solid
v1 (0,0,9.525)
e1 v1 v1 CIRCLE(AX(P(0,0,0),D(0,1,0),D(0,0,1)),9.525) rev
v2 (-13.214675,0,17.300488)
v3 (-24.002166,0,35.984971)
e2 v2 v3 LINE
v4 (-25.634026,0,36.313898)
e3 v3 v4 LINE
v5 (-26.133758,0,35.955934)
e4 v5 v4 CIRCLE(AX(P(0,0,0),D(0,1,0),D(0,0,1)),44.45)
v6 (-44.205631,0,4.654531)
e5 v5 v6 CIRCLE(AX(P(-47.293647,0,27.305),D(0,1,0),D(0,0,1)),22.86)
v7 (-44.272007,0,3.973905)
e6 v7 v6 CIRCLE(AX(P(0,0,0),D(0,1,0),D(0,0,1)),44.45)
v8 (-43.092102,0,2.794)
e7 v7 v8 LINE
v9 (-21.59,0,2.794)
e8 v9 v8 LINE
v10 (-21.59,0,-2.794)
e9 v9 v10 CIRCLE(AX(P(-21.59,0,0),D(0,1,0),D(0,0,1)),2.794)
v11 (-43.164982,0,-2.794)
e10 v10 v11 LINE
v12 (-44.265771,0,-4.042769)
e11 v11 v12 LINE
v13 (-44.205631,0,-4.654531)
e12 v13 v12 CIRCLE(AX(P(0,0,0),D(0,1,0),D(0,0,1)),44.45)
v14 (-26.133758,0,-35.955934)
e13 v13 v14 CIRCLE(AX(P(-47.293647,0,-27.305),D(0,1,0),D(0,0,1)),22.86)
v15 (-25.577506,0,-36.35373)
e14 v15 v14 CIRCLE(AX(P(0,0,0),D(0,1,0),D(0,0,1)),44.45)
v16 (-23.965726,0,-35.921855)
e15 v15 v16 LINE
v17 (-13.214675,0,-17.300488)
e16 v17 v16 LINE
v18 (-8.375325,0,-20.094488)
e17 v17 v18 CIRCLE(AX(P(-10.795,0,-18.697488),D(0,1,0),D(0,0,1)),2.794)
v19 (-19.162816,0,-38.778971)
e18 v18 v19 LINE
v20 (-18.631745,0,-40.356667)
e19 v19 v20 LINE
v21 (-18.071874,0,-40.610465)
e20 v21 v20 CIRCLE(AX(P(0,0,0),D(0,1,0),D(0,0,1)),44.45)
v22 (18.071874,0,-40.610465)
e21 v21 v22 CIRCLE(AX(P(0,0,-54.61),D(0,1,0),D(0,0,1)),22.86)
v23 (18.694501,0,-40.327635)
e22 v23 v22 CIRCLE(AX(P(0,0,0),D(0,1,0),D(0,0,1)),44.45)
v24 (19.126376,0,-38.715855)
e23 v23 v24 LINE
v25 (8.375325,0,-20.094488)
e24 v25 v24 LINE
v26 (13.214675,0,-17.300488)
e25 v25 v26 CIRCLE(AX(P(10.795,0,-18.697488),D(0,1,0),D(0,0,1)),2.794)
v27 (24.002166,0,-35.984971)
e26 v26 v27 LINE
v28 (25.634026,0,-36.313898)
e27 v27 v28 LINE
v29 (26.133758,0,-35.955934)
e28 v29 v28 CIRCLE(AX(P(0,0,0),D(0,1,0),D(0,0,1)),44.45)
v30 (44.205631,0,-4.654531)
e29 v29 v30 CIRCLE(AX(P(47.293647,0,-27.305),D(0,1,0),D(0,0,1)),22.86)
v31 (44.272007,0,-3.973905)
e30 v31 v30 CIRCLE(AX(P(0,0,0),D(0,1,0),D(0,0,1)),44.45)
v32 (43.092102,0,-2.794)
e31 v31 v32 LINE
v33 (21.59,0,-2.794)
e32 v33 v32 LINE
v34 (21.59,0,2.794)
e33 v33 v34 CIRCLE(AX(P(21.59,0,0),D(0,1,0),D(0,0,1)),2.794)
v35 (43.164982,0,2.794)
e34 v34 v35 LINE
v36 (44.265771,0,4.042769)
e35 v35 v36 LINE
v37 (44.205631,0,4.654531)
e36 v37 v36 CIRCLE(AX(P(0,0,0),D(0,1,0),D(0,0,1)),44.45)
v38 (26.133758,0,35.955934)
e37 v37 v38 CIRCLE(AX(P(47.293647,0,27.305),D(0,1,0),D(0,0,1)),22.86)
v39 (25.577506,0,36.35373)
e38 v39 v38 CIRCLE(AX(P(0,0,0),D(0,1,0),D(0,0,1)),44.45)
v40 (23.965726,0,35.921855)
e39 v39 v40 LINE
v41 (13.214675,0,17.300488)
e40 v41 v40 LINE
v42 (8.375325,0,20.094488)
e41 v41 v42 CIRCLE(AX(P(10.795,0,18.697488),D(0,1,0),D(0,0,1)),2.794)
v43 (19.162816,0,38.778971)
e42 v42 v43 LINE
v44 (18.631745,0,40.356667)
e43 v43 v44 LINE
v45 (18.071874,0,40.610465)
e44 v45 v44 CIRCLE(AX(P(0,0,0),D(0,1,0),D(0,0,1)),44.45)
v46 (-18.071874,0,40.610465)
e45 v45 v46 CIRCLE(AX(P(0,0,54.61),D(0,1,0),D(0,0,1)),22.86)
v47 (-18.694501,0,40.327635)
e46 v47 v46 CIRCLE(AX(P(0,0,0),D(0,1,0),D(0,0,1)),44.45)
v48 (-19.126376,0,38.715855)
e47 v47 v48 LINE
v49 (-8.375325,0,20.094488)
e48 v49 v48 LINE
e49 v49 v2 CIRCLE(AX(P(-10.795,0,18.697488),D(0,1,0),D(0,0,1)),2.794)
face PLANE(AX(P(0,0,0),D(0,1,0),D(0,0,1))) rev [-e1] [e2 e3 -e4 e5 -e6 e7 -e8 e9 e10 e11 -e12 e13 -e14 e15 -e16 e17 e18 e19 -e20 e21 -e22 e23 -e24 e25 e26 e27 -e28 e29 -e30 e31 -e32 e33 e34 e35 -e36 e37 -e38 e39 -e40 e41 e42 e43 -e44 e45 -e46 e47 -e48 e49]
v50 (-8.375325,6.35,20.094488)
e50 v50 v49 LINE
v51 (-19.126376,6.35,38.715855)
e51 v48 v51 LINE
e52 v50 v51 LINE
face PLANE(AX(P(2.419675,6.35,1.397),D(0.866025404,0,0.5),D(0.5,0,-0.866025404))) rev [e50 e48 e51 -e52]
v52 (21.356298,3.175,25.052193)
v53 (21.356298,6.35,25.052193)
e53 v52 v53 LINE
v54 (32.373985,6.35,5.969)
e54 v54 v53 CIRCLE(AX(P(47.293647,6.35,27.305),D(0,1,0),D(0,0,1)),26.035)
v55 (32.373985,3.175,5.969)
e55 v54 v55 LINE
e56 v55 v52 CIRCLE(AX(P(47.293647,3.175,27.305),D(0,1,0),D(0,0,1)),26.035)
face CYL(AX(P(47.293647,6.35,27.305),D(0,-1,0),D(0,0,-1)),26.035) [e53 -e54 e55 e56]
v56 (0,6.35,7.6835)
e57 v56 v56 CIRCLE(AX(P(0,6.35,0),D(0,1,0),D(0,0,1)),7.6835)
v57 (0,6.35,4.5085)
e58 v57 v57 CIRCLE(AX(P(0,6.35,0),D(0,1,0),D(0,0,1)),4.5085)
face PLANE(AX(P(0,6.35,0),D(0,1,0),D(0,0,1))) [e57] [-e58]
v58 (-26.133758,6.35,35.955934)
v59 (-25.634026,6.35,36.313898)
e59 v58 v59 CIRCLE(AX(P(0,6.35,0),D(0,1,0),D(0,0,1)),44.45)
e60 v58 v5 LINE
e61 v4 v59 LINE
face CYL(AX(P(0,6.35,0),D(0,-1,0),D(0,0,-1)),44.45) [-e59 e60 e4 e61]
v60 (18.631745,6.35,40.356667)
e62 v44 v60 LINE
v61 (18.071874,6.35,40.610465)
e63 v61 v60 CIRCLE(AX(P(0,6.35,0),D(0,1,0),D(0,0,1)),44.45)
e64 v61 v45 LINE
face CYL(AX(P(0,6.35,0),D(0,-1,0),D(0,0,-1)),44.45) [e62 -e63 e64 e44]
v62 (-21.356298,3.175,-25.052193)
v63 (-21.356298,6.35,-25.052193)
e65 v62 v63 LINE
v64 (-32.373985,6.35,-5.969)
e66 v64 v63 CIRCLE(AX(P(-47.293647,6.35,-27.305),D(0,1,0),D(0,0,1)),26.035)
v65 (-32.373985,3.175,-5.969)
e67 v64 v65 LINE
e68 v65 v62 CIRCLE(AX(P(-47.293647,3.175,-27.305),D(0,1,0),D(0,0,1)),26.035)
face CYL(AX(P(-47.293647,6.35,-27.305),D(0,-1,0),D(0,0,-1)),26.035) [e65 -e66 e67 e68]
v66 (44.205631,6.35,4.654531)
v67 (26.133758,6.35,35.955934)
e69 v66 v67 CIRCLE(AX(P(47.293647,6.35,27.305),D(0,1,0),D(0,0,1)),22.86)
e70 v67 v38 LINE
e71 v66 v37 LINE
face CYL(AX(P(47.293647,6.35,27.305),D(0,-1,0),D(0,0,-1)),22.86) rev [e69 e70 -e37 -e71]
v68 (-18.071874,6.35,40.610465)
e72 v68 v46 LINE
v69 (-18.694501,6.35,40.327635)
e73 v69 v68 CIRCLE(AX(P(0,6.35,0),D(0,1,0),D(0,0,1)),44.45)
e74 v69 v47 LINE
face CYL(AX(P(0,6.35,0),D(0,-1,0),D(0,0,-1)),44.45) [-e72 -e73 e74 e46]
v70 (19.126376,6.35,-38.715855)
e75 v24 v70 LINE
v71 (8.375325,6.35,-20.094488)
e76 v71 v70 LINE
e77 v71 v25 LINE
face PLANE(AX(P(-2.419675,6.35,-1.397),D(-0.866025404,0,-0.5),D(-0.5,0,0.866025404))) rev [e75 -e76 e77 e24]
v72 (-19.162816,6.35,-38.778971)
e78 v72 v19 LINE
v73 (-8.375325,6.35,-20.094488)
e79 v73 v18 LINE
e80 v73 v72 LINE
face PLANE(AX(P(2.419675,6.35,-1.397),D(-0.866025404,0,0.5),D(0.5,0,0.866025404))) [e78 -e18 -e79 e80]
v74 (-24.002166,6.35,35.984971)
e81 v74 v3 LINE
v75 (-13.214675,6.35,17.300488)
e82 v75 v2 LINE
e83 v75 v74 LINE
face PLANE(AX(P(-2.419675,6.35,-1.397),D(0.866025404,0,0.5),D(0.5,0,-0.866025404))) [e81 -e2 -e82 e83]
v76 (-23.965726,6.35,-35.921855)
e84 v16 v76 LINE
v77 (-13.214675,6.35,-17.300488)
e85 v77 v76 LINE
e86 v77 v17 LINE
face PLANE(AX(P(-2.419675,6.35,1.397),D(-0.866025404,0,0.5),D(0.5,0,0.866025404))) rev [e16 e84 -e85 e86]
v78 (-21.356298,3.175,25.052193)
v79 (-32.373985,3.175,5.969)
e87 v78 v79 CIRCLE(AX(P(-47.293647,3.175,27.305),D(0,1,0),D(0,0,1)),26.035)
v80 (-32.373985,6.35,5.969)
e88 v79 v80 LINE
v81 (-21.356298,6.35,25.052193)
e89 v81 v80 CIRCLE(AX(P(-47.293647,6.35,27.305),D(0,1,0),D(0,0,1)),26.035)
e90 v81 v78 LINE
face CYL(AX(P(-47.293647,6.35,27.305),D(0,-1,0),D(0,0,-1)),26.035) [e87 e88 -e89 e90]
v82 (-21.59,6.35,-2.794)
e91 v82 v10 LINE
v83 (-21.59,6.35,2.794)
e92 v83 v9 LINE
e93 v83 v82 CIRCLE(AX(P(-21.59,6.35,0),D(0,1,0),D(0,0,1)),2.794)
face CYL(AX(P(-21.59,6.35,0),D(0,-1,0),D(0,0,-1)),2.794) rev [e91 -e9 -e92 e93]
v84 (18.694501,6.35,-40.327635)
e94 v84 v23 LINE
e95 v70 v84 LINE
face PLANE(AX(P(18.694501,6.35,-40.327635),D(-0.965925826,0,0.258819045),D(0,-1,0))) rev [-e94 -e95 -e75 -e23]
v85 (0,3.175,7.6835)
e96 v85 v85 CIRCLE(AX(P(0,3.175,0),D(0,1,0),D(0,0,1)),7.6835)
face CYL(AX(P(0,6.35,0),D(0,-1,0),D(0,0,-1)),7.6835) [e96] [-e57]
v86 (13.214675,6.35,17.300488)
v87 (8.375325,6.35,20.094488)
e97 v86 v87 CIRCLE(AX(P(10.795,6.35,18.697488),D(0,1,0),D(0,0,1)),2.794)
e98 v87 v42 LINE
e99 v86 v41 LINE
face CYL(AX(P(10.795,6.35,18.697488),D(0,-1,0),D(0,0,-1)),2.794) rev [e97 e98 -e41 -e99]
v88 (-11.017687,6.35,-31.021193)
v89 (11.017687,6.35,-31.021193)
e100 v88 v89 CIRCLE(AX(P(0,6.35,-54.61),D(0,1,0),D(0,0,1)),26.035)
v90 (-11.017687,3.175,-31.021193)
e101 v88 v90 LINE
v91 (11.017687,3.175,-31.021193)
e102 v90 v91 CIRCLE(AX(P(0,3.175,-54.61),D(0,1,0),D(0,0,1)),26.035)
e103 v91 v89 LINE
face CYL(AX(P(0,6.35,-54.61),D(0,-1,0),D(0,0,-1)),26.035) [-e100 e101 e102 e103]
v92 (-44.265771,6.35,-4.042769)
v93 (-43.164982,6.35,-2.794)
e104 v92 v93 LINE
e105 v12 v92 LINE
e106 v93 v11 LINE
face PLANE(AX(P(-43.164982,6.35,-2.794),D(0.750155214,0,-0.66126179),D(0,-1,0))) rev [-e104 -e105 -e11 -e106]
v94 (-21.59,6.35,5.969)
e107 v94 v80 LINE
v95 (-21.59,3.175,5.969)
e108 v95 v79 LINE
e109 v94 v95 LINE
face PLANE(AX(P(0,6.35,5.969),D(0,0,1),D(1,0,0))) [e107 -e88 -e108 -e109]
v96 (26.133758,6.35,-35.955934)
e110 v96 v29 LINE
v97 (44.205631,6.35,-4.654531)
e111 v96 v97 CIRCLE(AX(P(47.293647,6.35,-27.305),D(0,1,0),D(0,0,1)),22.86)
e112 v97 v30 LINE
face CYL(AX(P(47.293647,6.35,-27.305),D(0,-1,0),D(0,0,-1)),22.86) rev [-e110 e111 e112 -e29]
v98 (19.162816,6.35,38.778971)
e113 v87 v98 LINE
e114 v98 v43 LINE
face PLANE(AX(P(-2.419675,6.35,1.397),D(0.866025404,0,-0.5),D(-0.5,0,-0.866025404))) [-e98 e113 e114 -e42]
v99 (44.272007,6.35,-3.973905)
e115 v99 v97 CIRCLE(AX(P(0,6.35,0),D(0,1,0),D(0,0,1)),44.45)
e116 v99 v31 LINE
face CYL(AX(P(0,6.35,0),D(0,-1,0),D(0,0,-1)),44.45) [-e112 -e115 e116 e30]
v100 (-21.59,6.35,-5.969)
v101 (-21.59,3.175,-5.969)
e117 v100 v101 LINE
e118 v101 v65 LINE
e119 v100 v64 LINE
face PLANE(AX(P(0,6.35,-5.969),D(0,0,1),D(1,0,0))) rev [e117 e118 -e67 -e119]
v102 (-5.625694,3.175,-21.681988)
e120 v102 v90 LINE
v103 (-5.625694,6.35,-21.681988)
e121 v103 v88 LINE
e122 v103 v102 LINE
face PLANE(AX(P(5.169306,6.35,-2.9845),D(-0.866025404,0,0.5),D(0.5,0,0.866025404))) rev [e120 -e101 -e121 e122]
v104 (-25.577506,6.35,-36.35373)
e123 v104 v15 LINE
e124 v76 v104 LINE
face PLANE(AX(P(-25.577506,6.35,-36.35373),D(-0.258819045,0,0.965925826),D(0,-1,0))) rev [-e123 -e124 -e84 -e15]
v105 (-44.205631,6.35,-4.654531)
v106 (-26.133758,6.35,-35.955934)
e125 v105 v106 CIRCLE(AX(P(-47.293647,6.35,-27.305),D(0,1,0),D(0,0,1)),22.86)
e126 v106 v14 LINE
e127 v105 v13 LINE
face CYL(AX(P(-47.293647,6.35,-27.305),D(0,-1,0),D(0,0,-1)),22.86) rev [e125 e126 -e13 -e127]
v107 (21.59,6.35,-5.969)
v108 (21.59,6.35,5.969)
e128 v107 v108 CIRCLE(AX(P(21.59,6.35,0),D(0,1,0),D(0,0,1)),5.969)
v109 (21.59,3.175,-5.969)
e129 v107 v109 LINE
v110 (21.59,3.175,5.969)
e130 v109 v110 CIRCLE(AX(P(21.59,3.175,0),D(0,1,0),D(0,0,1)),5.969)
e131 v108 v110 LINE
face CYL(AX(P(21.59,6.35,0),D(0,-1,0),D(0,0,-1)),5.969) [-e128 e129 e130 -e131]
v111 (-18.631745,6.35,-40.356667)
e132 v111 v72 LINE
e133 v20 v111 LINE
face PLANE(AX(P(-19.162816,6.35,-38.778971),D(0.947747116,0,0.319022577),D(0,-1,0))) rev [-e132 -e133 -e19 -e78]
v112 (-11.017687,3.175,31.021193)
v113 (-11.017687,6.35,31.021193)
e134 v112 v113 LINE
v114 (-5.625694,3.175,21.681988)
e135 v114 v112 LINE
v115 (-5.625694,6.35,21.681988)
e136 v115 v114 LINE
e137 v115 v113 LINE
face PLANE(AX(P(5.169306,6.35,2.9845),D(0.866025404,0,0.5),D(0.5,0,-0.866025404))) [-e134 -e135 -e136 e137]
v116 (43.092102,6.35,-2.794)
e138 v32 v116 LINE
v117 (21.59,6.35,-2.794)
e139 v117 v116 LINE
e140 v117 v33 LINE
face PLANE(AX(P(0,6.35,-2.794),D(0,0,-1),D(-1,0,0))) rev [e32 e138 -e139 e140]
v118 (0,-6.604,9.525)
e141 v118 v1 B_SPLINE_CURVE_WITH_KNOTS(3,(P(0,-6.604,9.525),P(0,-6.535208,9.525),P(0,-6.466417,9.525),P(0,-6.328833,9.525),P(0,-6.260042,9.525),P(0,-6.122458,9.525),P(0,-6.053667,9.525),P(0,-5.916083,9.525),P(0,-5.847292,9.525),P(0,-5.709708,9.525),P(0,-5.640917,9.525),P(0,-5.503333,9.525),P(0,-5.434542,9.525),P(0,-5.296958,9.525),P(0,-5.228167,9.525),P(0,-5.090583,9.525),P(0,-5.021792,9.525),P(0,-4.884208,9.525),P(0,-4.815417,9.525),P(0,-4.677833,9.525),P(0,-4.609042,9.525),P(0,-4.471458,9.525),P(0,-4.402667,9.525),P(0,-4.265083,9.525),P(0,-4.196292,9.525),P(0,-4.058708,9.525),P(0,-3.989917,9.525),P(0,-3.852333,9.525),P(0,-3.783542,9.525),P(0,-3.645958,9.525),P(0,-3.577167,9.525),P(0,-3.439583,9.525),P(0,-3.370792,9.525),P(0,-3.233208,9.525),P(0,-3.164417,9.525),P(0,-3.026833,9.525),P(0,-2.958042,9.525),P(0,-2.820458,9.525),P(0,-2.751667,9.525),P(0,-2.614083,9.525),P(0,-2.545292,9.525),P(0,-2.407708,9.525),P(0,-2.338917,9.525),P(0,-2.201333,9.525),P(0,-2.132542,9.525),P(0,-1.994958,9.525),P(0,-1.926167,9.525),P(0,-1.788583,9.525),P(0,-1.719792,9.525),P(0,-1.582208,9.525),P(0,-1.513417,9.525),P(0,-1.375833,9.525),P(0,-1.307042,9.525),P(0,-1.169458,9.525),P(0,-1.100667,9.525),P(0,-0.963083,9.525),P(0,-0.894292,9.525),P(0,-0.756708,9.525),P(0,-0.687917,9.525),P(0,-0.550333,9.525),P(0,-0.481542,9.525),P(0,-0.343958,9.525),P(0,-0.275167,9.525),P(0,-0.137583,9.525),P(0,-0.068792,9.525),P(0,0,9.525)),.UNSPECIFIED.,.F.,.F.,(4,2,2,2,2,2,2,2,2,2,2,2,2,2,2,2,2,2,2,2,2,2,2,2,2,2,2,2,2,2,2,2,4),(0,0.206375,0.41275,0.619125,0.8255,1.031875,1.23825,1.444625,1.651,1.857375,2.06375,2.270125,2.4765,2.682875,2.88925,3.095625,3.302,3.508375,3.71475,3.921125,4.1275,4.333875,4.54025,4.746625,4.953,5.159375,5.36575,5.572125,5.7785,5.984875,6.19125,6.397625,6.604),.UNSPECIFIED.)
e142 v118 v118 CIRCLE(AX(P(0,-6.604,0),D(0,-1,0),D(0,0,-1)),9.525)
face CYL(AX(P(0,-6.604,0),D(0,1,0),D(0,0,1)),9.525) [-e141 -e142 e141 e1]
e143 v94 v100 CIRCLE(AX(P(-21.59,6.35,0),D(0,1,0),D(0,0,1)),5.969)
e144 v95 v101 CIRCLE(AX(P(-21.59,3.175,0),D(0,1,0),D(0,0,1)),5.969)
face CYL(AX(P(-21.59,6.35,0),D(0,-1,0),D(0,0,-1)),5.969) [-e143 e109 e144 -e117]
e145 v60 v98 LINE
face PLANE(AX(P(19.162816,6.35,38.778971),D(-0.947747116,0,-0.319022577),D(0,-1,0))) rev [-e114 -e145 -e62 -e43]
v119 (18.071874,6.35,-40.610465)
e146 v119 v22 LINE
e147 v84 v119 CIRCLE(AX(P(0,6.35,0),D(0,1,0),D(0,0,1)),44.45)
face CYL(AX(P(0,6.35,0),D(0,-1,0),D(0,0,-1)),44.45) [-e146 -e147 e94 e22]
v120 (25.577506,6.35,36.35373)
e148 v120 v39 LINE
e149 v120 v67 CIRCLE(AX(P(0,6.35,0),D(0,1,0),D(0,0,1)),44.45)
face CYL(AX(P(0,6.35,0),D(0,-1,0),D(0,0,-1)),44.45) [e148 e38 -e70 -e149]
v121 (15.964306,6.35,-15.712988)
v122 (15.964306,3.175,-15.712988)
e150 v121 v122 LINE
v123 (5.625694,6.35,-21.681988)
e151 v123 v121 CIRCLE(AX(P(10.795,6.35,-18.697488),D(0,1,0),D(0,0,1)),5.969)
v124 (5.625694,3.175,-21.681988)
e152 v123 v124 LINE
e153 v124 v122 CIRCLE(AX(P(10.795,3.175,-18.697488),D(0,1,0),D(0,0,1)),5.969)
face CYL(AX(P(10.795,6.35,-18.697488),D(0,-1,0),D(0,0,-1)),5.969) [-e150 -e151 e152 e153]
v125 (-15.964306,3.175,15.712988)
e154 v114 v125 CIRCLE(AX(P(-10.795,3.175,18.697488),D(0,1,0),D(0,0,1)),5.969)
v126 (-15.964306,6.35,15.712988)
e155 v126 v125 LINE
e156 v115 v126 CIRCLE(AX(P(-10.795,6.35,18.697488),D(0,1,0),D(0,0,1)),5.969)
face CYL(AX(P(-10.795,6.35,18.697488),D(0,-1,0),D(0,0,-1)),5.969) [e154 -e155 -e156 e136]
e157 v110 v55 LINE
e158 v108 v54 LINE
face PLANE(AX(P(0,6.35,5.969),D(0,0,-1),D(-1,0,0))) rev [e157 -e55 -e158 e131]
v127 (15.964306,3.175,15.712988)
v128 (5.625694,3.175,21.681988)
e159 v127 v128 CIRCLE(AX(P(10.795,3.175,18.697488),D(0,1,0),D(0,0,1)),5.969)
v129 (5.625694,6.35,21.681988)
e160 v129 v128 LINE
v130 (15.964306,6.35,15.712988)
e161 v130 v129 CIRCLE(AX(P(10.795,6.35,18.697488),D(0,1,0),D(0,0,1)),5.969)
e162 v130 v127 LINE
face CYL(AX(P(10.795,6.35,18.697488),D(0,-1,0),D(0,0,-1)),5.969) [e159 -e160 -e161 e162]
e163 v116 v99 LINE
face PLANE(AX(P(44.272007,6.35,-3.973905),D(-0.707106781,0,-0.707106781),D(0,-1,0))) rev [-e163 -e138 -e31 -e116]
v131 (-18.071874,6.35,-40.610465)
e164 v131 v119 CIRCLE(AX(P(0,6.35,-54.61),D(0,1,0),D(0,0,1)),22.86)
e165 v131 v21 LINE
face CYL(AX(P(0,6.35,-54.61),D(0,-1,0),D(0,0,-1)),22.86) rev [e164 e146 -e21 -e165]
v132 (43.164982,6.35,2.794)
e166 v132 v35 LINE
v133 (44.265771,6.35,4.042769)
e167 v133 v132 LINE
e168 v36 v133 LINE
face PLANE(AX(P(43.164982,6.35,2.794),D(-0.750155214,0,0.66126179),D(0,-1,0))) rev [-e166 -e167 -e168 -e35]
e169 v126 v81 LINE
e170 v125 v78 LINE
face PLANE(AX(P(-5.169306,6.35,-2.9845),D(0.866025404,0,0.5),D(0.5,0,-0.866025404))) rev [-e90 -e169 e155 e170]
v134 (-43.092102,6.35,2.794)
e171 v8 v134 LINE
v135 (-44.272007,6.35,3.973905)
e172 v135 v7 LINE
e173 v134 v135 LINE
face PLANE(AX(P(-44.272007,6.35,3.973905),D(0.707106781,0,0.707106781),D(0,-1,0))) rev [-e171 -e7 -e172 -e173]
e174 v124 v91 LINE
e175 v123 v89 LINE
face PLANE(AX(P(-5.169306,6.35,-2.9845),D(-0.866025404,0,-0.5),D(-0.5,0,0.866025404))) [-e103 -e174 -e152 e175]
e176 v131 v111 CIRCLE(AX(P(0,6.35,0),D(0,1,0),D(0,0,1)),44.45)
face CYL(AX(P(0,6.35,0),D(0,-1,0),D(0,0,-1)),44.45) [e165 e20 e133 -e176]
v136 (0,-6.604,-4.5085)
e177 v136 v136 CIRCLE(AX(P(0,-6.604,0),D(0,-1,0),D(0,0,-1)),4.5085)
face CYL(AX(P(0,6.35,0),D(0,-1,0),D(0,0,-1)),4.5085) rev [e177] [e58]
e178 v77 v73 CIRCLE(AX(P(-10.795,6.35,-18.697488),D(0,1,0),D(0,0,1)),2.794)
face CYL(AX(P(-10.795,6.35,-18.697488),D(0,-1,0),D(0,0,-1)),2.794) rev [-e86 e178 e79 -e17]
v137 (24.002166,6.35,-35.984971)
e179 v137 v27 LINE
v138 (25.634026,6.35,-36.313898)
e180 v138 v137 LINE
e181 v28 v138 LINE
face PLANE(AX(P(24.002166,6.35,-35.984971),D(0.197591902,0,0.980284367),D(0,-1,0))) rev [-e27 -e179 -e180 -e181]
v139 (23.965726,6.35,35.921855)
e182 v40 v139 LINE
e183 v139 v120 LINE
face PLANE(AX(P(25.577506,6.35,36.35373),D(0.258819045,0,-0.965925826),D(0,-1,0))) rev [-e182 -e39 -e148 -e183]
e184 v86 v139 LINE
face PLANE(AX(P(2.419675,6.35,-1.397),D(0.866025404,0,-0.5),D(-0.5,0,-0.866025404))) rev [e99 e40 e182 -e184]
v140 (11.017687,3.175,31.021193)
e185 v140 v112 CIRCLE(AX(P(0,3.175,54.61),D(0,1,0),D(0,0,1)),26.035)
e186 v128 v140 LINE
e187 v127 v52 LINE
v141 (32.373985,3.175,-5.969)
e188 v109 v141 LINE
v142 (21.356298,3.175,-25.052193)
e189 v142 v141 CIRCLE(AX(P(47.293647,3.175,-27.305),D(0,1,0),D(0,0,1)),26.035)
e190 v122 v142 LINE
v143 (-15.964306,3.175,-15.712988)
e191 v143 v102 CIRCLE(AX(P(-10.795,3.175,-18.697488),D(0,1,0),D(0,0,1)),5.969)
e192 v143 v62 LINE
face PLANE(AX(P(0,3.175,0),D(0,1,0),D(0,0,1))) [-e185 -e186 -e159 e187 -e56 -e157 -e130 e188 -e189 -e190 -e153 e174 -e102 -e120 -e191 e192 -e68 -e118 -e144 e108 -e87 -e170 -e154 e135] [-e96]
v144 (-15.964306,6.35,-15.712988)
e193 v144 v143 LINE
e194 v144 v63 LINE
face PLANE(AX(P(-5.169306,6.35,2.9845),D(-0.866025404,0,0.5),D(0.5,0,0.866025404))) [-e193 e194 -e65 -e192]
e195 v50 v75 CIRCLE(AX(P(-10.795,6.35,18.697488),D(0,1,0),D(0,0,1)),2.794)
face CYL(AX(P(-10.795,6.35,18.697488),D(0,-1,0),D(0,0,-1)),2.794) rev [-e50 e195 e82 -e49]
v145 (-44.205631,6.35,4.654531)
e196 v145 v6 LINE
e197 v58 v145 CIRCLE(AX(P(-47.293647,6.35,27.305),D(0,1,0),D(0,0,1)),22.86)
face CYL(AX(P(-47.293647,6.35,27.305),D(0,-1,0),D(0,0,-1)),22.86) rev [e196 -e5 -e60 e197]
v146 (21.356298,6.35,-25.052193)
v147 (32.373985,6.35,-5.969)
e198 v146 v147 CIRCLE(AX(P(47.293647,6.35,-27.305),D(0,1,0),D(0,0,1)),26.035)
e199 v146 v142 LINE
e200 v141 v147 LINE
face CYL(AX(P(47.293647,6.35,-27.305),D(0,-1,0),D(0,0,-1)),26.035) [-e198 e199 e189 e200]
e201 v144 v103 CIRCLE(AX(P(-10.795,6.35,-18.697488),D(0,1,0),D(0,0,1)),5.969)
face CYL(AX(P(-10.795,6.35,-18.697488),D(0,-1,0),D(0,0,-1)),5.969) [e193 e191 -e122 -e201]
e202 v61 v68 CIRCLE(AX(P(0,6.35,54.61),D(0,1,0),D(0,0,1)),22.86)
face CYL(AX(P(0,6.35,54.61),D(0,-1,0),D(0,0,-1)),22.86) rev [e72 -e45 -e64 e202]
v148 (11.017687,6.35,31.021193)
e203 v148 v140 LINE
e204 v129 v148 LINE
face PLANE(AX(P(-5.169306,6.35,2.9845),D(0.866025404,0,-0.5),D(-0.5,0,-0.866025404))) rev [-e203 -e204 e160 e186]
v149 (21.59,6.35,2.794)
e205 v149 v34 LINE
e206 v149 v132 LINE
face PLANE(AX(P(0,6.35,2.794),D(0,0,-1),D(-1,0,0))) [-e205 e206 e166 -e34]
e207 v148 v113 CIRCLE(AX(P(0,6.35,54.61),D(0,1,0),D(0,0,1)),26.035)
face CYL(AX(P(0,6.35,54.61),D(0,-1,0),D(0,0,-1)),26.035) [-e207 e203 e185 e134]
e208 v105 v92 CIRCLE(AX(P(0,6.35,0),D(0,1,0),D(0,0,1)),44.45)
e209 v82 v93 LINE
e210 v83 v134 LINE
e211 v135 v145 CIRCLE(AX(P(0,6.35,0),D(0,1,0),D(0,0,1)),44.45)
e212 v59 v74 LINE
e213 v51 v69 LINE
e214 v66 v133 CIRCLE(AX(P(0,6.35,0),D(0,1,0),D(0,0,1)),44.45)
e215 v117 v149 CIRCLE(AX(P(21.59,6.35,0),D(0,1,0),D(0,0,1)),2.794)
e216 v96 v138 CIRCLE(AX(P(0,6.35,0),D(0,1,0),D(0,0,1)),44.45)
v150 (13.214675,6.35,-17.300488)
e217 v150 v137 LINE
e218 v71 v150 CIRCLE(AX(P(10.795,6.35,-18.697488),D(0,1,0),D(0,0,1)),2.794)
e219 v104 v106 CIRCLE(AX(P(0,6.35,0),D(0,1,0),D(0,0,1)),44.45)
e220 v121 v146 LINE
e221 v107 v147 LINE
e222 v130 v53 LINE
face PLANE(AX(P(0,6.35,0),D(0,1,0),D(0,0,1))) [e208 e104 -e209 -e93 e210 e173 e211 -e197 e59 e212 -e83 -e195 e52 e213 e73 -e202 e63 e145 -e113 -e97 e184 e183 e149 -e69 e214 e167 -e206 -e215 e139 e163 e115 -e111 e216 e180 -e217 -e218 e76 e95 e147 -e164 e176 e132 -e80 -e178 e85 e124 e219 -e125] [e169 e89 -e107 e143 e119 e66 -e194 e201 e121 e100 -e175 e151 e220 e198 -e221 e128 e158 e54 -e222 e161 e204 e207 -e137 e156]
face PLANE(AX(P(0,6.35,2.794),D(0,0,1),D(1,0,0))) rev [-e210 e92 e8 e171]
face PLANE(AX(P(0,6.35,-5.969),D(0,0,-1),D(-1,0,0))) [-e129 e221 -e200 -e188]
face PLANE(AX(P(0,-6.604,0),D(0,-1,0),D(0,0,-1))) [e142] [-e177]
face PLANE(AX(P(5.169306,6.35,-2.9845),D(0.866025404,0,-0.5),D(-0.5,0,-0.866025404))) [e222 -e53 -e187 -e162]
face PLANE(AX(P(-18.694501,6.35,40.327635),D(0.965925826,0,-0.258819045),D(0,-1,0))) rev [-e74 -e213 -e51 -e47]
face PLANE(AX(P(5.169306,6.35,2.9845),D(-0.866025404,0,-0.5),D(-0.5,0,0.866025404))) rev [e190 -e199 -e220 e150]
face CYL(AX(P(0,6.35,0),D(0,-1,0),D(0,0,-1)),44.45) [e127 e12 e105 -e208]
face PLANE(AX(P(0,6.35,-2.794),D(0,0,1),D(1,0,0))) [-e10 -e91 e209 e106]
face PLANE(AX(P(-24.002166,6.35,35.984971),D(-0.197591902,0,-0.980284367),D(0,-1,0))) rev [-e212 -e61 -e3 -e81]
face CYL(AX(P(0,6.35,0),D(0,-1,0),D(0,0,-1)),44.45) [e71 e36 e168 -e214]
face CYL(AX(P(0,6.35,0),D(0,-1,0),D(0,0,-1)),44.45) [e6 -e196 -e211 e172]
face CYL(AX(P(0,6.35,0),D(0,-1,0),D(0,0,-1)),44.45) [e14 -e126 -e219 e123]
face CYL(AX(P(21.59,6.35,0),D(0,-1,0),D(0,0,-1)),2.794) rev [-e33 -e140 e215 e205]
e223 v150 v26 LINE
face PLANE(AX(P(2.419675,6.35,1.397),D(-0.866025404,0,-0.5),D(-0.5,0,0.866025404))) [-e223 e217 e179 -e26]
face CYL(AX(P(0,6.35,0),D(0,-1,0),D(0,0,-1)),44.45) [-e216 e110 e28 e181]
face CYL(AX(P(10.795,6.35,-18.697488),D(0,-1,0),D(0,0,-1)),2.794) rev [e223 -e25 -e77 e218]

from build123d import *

# Parameters (mm, degrees)
SKETCH1_R           = 4.5085
BOSS_EXTRUDE1_DEPTH = 6.35
CHAMFER1_SIZE       = 1.27
CHAMFER1_SIZE_2     = 1.197119737
SHELL3_T            = -3.175
BOSS_EXTRUDE2_START = 6.604
SKETCH4_R           = 9.525
SKETCH4_R_2         = 4.5085
BOSS_EXTRUDE2_DEPTH = 6.604


with BuildPart() as part:
    # Sketch1 → Boss-Extrude1 (new body)
    with BuildSketch(Plane(origin=(0, 0, 0), x_dir=(1, 0, 0), z_dir=(0, 1, 0))):
        with BuildLine():
            ThreePointArc((-18.071873811, 40.610465116), (0, 31.75), (18.071873811, 40.610465116))
            ThreePointArc((18.071873811, 40.610465116), (18.920798217, 40.221957869), (19.761375854, 39.815707006))
            Line((19.761375854, 39.815707006), (8.375325022, 20.094488468))
            ThreePointArc((8.375325022, 20.094488468), (8.096203241, 17.974348056), (9.398, 16.27781349))
            ThreePointArc((9.398, 16.27781349), (11.518140412, 15.998691709), (13.214674978, 17.300488468))
            Line((13.214674978, 17.300488468), (24.60072581, 37.021707006))
            ThreePointArc((24.60072581, 37.021707006), (25.372838196, 36.49687085), (26.133757545, 35.955934372))
            ThreePointArc((26.133757545, 35.955934372), (27.49630657, 15.875), (44.205631356, 4.654530744))
            ThreePointArc((44.205631356, 4.654530744), (44.293636413, 3.725087019), (44.362101663, 2.794))
            Line((44.362101663, 2.794), (21.59, 2.794))
            ThreePointArc((21.59, 2.794), (19.614343653, 1.975656347), (18.796, 0))
            ThreePointArc((18.796, 0), (19.614343653, -1.975656347), (21.59, -2.794))
            Line((21.59, -2.794), (44.362101663, -2.794))
            ThreePointArc((44.362101663, -2.794), (44.293636413, -3.725087019), (44.205631356, -4.654530744))
            ThreePointArc((44.205631356, -4.654530744), (27.49630657, -15.875), (26.133757545, -35.955934372))
            ThreePointArc((26.133757545, -35.955934372), (25.372838196, -36.49687085), (24.60072581, -37.021707006))
            Line((24.60072581, -37.021707006), (13.214674978, -17.300488468))
            ThreePointArc((13.214674978, -17.300488468), (11.518140412, -15.998691709), (9.398, -16.27781349))
            ThreePointArc((9.398, -16.27781349), (8.096203241, -17.974348056), (8.375325022, -20.094488468))
            Line((8.375325022, -20.094488468), (19.761375854, -39.815707006))
            ThreePointArc((19.761375854, -39.815707006), (18.920798217, -40.221957869), (18.071873811, -40.610465116))
            ThreePointArc((18.071873811, -40.610465116), (0, -31.75), (-18.071873811, -40.610465116))
            ThreePointArc((-18.071873811, -40.610465116), (-18.920798217, -40.221957869), (-19.761375854, -39.815707006))
            Line((-19.761375854, -39.815707006), (-8.375325022, -20.094488468))
            ThreePointArc((-8.375325022, -20.094488468), (-8.096203241, -17.974348056), (-9.398, -16.27781349))
            ThreePointArc((-9.398, -16.27781349), (-11.518140412, -15.998691709), (-13.214674978, -17.300488468))
            Line((-13.214674978, -17.300488468), (-24.60072581, -37.021707006))
            ThreePointArc((-24.60072581, -37.021707006), (-25.372838196, -36.49687085), (-26.133757545, -35.955934372))
            ThreePointArc((-26.133757545, -35.955934372), (-27.49630657, -15.875), (-44.205631356, -4.654530744))
            ThreePointArc((-44.205631356, -4.654530744), (-44.293636413, -3.725087019), (-44.362101663, -2.794))
            Line((-44.362101663, -2.794), (-21.59, -2.794))
            ThreePointArc((-21.59, -2.794), (-19.614343653, -1.975656347), (-18.796, 0))
            ThreePointArc((-18.796, 0), (-19.614343653, 1.975656347), (-21.59, 2.794))
            Line((-21.59, 2.794), (-44.362101663, 2.794))
            ThreePointArc((-44.362101663, 2.794), (-44.293636413, 3.725087019), (-44.205631356, 4.654530744))
            ThreePointArc((-44.205631356, 4.654530744), (-27.49630657, 15.875), (-26.133757545, 35.955934372))
            ThreePointArc((-26.133757545, 35.955934372), (-25.372838196, 36.49687085), (-24.60072581, 37.021707006))
            Line((-24.60072581, 37.021707006), (-13.214674978, 17.300488468))
            ThreePointArc((-13.214674978, 17.300488468), (-11.518140412, 15.998691709), (-9.398, 16.27781349))
            ThreePointArc((-9.398, 16.27781349), (-8.096203241, 17.974348056), (-8.375325022, 20.094488468))
            Line((-8.375325022, 20.094488468), (-19.761375854, 39.815707006))
            ThreePointArc((-19.761375854, 39.815707006), (-18.920798217, 40.221957869), (-18.071873811, 40.610465116))
        make_face()
        with Locations(Location((0, 0, 0), (0, 0, 270))):
            Circle(SKETCH1_R, mode=Mode.SUBTRACT)
    extrude(amount=BOSS_EXTRUDE1_DEPTH)

    # Chamfer1
    # the kernel refuses this chamfer: 1.27, 1.197119737 mm, written as the material it takes off along each edge
    with BuildSketch(Plane(origin=(19.761375854, -3.266037395, -39.815707006), x_dir=(-0.5000000000000074, 0, 0.8660254037844344), z_dir=(0, 1, 0)), Plane(origin=(44.362101663, -3.266037395, -2.794), x_dir=(-1, 0, 0), z_dir=(0, 1, 0)), Plane(origin=(24.60072581, -3.266037395, 37.021707006), x_dir=(-0.49999999999999695, 0, -0.8660254037844405), z_dir=(0, 1, 0)), Plane(origin=(-19.761375854, -3.266037395, 39.815707006), x_dir=(0.5000000000000053, 0, -0.8660254037844356), z_dir=(0, 1, 0)), Plane(origin=(-44.362101663, -3.266037395, 2.794), x_dir=(1, 0, 0), z_dir=(0, 1, 0)), Plane(origin=(-24.60072581, -3.266037395, -37.021707006), x_dir=(0.4999999999999945, 0, 0.8660254037844418), z_dir=(0, 1, 0))) as chamfer1_piece_1:
        with BuildLine():
            Line((CHAMFER1_SIZE, 0), (0.090094948, -1.179905052))
            ThreePointArc((0.090094948, -1.179905052), (0.042382893, -0.606739351), (0, 0))
            Line((0, 0), (CHAMFER1_SIZE, 0))
        make_face()
    extrude(amount=12.882074789, mode=Mode.SUBTRACT)
    with BuildSketch(Plane(origin=(24.60072581, -3.221012361, -37.021707006), x_dir=(0.8250043252852427, 0, 0.5651264135223565), z_dir=(0, 1, 0)), Plane(origin=(44.362101663, -3.221012361, 2.794), x_dir=(-0.07691166781732867, 0, 0.9970379106902391), z_dir=(0, 1, 0)), Plane(origin=(19.761375854, -3.221012361, 39.815707006), x_dir=(-0.9019159931025786, 0, 0.4319114971678681), z_dir=(0, 1, 0)), Plane(origin=(-24.60072581, -3.221012361, 37.021707006), x_dir=(-0.8250043252852418, 0, -0.5651264135223576), z_dir=(0, 1, 0)), Plane(origin=(-44.362101663, -3.221012361, -2.794), x_dir=(0.07691166781734438, 0, -0.9970379106902378), z_dir=(0, 1, 0)), Plane(origin=(-19.761375854, -3.221012361, -39.815707006), x_dir=(0.9019159931025836, 0, -0.4319114971678576), z_dir=(0, 1, 0))) as chamfer1_piece_2:
        with BuildLine():
            Line((1.252478609, 0), (CHAMFER1_SIZE_2 * 0.0769116677883, -CHAMFER1_SIZE_2 * 0.997037910314))
            Line((CHAMFER1_SIZE_2 * 0.0769116677883, -CHAMFER1_SIZE_2 * 0.997037910314), (0, 0))
            ThreePointArc((0, 0), (0.643939498, 0.00440812), (1.252478609, 0))
        make_face()
    extrude(amount=12.792024723, mode=Mode.SUBTRACT)

    # Shell3
    shell3_openings = [part.faces().sort_by_distance(p)[0] for p in [
        (-17.59446424, 6.35, 0),
    ]]
    offset(amount=SHELL3_T, openings=shell3_openings)

    # Sketch4 → Boss-Extrude2 (add)
    with BuildSketch(Plane.XZ.offset(BOSS_EXTRUDE2_START)):
        with Locations(Location((0, 0, 0), (0, 0, 90))):
            Circle(SKETCH4_R)
        with Locations(Location((0, 0, 0), (0, 0, 270))):
            Circle(SKETCH4_R_2, mode=Mode.SUBTRACT)
    extrude(amount=-BOSS_EXTRUDE2_DEPTH)


solid = part.part
